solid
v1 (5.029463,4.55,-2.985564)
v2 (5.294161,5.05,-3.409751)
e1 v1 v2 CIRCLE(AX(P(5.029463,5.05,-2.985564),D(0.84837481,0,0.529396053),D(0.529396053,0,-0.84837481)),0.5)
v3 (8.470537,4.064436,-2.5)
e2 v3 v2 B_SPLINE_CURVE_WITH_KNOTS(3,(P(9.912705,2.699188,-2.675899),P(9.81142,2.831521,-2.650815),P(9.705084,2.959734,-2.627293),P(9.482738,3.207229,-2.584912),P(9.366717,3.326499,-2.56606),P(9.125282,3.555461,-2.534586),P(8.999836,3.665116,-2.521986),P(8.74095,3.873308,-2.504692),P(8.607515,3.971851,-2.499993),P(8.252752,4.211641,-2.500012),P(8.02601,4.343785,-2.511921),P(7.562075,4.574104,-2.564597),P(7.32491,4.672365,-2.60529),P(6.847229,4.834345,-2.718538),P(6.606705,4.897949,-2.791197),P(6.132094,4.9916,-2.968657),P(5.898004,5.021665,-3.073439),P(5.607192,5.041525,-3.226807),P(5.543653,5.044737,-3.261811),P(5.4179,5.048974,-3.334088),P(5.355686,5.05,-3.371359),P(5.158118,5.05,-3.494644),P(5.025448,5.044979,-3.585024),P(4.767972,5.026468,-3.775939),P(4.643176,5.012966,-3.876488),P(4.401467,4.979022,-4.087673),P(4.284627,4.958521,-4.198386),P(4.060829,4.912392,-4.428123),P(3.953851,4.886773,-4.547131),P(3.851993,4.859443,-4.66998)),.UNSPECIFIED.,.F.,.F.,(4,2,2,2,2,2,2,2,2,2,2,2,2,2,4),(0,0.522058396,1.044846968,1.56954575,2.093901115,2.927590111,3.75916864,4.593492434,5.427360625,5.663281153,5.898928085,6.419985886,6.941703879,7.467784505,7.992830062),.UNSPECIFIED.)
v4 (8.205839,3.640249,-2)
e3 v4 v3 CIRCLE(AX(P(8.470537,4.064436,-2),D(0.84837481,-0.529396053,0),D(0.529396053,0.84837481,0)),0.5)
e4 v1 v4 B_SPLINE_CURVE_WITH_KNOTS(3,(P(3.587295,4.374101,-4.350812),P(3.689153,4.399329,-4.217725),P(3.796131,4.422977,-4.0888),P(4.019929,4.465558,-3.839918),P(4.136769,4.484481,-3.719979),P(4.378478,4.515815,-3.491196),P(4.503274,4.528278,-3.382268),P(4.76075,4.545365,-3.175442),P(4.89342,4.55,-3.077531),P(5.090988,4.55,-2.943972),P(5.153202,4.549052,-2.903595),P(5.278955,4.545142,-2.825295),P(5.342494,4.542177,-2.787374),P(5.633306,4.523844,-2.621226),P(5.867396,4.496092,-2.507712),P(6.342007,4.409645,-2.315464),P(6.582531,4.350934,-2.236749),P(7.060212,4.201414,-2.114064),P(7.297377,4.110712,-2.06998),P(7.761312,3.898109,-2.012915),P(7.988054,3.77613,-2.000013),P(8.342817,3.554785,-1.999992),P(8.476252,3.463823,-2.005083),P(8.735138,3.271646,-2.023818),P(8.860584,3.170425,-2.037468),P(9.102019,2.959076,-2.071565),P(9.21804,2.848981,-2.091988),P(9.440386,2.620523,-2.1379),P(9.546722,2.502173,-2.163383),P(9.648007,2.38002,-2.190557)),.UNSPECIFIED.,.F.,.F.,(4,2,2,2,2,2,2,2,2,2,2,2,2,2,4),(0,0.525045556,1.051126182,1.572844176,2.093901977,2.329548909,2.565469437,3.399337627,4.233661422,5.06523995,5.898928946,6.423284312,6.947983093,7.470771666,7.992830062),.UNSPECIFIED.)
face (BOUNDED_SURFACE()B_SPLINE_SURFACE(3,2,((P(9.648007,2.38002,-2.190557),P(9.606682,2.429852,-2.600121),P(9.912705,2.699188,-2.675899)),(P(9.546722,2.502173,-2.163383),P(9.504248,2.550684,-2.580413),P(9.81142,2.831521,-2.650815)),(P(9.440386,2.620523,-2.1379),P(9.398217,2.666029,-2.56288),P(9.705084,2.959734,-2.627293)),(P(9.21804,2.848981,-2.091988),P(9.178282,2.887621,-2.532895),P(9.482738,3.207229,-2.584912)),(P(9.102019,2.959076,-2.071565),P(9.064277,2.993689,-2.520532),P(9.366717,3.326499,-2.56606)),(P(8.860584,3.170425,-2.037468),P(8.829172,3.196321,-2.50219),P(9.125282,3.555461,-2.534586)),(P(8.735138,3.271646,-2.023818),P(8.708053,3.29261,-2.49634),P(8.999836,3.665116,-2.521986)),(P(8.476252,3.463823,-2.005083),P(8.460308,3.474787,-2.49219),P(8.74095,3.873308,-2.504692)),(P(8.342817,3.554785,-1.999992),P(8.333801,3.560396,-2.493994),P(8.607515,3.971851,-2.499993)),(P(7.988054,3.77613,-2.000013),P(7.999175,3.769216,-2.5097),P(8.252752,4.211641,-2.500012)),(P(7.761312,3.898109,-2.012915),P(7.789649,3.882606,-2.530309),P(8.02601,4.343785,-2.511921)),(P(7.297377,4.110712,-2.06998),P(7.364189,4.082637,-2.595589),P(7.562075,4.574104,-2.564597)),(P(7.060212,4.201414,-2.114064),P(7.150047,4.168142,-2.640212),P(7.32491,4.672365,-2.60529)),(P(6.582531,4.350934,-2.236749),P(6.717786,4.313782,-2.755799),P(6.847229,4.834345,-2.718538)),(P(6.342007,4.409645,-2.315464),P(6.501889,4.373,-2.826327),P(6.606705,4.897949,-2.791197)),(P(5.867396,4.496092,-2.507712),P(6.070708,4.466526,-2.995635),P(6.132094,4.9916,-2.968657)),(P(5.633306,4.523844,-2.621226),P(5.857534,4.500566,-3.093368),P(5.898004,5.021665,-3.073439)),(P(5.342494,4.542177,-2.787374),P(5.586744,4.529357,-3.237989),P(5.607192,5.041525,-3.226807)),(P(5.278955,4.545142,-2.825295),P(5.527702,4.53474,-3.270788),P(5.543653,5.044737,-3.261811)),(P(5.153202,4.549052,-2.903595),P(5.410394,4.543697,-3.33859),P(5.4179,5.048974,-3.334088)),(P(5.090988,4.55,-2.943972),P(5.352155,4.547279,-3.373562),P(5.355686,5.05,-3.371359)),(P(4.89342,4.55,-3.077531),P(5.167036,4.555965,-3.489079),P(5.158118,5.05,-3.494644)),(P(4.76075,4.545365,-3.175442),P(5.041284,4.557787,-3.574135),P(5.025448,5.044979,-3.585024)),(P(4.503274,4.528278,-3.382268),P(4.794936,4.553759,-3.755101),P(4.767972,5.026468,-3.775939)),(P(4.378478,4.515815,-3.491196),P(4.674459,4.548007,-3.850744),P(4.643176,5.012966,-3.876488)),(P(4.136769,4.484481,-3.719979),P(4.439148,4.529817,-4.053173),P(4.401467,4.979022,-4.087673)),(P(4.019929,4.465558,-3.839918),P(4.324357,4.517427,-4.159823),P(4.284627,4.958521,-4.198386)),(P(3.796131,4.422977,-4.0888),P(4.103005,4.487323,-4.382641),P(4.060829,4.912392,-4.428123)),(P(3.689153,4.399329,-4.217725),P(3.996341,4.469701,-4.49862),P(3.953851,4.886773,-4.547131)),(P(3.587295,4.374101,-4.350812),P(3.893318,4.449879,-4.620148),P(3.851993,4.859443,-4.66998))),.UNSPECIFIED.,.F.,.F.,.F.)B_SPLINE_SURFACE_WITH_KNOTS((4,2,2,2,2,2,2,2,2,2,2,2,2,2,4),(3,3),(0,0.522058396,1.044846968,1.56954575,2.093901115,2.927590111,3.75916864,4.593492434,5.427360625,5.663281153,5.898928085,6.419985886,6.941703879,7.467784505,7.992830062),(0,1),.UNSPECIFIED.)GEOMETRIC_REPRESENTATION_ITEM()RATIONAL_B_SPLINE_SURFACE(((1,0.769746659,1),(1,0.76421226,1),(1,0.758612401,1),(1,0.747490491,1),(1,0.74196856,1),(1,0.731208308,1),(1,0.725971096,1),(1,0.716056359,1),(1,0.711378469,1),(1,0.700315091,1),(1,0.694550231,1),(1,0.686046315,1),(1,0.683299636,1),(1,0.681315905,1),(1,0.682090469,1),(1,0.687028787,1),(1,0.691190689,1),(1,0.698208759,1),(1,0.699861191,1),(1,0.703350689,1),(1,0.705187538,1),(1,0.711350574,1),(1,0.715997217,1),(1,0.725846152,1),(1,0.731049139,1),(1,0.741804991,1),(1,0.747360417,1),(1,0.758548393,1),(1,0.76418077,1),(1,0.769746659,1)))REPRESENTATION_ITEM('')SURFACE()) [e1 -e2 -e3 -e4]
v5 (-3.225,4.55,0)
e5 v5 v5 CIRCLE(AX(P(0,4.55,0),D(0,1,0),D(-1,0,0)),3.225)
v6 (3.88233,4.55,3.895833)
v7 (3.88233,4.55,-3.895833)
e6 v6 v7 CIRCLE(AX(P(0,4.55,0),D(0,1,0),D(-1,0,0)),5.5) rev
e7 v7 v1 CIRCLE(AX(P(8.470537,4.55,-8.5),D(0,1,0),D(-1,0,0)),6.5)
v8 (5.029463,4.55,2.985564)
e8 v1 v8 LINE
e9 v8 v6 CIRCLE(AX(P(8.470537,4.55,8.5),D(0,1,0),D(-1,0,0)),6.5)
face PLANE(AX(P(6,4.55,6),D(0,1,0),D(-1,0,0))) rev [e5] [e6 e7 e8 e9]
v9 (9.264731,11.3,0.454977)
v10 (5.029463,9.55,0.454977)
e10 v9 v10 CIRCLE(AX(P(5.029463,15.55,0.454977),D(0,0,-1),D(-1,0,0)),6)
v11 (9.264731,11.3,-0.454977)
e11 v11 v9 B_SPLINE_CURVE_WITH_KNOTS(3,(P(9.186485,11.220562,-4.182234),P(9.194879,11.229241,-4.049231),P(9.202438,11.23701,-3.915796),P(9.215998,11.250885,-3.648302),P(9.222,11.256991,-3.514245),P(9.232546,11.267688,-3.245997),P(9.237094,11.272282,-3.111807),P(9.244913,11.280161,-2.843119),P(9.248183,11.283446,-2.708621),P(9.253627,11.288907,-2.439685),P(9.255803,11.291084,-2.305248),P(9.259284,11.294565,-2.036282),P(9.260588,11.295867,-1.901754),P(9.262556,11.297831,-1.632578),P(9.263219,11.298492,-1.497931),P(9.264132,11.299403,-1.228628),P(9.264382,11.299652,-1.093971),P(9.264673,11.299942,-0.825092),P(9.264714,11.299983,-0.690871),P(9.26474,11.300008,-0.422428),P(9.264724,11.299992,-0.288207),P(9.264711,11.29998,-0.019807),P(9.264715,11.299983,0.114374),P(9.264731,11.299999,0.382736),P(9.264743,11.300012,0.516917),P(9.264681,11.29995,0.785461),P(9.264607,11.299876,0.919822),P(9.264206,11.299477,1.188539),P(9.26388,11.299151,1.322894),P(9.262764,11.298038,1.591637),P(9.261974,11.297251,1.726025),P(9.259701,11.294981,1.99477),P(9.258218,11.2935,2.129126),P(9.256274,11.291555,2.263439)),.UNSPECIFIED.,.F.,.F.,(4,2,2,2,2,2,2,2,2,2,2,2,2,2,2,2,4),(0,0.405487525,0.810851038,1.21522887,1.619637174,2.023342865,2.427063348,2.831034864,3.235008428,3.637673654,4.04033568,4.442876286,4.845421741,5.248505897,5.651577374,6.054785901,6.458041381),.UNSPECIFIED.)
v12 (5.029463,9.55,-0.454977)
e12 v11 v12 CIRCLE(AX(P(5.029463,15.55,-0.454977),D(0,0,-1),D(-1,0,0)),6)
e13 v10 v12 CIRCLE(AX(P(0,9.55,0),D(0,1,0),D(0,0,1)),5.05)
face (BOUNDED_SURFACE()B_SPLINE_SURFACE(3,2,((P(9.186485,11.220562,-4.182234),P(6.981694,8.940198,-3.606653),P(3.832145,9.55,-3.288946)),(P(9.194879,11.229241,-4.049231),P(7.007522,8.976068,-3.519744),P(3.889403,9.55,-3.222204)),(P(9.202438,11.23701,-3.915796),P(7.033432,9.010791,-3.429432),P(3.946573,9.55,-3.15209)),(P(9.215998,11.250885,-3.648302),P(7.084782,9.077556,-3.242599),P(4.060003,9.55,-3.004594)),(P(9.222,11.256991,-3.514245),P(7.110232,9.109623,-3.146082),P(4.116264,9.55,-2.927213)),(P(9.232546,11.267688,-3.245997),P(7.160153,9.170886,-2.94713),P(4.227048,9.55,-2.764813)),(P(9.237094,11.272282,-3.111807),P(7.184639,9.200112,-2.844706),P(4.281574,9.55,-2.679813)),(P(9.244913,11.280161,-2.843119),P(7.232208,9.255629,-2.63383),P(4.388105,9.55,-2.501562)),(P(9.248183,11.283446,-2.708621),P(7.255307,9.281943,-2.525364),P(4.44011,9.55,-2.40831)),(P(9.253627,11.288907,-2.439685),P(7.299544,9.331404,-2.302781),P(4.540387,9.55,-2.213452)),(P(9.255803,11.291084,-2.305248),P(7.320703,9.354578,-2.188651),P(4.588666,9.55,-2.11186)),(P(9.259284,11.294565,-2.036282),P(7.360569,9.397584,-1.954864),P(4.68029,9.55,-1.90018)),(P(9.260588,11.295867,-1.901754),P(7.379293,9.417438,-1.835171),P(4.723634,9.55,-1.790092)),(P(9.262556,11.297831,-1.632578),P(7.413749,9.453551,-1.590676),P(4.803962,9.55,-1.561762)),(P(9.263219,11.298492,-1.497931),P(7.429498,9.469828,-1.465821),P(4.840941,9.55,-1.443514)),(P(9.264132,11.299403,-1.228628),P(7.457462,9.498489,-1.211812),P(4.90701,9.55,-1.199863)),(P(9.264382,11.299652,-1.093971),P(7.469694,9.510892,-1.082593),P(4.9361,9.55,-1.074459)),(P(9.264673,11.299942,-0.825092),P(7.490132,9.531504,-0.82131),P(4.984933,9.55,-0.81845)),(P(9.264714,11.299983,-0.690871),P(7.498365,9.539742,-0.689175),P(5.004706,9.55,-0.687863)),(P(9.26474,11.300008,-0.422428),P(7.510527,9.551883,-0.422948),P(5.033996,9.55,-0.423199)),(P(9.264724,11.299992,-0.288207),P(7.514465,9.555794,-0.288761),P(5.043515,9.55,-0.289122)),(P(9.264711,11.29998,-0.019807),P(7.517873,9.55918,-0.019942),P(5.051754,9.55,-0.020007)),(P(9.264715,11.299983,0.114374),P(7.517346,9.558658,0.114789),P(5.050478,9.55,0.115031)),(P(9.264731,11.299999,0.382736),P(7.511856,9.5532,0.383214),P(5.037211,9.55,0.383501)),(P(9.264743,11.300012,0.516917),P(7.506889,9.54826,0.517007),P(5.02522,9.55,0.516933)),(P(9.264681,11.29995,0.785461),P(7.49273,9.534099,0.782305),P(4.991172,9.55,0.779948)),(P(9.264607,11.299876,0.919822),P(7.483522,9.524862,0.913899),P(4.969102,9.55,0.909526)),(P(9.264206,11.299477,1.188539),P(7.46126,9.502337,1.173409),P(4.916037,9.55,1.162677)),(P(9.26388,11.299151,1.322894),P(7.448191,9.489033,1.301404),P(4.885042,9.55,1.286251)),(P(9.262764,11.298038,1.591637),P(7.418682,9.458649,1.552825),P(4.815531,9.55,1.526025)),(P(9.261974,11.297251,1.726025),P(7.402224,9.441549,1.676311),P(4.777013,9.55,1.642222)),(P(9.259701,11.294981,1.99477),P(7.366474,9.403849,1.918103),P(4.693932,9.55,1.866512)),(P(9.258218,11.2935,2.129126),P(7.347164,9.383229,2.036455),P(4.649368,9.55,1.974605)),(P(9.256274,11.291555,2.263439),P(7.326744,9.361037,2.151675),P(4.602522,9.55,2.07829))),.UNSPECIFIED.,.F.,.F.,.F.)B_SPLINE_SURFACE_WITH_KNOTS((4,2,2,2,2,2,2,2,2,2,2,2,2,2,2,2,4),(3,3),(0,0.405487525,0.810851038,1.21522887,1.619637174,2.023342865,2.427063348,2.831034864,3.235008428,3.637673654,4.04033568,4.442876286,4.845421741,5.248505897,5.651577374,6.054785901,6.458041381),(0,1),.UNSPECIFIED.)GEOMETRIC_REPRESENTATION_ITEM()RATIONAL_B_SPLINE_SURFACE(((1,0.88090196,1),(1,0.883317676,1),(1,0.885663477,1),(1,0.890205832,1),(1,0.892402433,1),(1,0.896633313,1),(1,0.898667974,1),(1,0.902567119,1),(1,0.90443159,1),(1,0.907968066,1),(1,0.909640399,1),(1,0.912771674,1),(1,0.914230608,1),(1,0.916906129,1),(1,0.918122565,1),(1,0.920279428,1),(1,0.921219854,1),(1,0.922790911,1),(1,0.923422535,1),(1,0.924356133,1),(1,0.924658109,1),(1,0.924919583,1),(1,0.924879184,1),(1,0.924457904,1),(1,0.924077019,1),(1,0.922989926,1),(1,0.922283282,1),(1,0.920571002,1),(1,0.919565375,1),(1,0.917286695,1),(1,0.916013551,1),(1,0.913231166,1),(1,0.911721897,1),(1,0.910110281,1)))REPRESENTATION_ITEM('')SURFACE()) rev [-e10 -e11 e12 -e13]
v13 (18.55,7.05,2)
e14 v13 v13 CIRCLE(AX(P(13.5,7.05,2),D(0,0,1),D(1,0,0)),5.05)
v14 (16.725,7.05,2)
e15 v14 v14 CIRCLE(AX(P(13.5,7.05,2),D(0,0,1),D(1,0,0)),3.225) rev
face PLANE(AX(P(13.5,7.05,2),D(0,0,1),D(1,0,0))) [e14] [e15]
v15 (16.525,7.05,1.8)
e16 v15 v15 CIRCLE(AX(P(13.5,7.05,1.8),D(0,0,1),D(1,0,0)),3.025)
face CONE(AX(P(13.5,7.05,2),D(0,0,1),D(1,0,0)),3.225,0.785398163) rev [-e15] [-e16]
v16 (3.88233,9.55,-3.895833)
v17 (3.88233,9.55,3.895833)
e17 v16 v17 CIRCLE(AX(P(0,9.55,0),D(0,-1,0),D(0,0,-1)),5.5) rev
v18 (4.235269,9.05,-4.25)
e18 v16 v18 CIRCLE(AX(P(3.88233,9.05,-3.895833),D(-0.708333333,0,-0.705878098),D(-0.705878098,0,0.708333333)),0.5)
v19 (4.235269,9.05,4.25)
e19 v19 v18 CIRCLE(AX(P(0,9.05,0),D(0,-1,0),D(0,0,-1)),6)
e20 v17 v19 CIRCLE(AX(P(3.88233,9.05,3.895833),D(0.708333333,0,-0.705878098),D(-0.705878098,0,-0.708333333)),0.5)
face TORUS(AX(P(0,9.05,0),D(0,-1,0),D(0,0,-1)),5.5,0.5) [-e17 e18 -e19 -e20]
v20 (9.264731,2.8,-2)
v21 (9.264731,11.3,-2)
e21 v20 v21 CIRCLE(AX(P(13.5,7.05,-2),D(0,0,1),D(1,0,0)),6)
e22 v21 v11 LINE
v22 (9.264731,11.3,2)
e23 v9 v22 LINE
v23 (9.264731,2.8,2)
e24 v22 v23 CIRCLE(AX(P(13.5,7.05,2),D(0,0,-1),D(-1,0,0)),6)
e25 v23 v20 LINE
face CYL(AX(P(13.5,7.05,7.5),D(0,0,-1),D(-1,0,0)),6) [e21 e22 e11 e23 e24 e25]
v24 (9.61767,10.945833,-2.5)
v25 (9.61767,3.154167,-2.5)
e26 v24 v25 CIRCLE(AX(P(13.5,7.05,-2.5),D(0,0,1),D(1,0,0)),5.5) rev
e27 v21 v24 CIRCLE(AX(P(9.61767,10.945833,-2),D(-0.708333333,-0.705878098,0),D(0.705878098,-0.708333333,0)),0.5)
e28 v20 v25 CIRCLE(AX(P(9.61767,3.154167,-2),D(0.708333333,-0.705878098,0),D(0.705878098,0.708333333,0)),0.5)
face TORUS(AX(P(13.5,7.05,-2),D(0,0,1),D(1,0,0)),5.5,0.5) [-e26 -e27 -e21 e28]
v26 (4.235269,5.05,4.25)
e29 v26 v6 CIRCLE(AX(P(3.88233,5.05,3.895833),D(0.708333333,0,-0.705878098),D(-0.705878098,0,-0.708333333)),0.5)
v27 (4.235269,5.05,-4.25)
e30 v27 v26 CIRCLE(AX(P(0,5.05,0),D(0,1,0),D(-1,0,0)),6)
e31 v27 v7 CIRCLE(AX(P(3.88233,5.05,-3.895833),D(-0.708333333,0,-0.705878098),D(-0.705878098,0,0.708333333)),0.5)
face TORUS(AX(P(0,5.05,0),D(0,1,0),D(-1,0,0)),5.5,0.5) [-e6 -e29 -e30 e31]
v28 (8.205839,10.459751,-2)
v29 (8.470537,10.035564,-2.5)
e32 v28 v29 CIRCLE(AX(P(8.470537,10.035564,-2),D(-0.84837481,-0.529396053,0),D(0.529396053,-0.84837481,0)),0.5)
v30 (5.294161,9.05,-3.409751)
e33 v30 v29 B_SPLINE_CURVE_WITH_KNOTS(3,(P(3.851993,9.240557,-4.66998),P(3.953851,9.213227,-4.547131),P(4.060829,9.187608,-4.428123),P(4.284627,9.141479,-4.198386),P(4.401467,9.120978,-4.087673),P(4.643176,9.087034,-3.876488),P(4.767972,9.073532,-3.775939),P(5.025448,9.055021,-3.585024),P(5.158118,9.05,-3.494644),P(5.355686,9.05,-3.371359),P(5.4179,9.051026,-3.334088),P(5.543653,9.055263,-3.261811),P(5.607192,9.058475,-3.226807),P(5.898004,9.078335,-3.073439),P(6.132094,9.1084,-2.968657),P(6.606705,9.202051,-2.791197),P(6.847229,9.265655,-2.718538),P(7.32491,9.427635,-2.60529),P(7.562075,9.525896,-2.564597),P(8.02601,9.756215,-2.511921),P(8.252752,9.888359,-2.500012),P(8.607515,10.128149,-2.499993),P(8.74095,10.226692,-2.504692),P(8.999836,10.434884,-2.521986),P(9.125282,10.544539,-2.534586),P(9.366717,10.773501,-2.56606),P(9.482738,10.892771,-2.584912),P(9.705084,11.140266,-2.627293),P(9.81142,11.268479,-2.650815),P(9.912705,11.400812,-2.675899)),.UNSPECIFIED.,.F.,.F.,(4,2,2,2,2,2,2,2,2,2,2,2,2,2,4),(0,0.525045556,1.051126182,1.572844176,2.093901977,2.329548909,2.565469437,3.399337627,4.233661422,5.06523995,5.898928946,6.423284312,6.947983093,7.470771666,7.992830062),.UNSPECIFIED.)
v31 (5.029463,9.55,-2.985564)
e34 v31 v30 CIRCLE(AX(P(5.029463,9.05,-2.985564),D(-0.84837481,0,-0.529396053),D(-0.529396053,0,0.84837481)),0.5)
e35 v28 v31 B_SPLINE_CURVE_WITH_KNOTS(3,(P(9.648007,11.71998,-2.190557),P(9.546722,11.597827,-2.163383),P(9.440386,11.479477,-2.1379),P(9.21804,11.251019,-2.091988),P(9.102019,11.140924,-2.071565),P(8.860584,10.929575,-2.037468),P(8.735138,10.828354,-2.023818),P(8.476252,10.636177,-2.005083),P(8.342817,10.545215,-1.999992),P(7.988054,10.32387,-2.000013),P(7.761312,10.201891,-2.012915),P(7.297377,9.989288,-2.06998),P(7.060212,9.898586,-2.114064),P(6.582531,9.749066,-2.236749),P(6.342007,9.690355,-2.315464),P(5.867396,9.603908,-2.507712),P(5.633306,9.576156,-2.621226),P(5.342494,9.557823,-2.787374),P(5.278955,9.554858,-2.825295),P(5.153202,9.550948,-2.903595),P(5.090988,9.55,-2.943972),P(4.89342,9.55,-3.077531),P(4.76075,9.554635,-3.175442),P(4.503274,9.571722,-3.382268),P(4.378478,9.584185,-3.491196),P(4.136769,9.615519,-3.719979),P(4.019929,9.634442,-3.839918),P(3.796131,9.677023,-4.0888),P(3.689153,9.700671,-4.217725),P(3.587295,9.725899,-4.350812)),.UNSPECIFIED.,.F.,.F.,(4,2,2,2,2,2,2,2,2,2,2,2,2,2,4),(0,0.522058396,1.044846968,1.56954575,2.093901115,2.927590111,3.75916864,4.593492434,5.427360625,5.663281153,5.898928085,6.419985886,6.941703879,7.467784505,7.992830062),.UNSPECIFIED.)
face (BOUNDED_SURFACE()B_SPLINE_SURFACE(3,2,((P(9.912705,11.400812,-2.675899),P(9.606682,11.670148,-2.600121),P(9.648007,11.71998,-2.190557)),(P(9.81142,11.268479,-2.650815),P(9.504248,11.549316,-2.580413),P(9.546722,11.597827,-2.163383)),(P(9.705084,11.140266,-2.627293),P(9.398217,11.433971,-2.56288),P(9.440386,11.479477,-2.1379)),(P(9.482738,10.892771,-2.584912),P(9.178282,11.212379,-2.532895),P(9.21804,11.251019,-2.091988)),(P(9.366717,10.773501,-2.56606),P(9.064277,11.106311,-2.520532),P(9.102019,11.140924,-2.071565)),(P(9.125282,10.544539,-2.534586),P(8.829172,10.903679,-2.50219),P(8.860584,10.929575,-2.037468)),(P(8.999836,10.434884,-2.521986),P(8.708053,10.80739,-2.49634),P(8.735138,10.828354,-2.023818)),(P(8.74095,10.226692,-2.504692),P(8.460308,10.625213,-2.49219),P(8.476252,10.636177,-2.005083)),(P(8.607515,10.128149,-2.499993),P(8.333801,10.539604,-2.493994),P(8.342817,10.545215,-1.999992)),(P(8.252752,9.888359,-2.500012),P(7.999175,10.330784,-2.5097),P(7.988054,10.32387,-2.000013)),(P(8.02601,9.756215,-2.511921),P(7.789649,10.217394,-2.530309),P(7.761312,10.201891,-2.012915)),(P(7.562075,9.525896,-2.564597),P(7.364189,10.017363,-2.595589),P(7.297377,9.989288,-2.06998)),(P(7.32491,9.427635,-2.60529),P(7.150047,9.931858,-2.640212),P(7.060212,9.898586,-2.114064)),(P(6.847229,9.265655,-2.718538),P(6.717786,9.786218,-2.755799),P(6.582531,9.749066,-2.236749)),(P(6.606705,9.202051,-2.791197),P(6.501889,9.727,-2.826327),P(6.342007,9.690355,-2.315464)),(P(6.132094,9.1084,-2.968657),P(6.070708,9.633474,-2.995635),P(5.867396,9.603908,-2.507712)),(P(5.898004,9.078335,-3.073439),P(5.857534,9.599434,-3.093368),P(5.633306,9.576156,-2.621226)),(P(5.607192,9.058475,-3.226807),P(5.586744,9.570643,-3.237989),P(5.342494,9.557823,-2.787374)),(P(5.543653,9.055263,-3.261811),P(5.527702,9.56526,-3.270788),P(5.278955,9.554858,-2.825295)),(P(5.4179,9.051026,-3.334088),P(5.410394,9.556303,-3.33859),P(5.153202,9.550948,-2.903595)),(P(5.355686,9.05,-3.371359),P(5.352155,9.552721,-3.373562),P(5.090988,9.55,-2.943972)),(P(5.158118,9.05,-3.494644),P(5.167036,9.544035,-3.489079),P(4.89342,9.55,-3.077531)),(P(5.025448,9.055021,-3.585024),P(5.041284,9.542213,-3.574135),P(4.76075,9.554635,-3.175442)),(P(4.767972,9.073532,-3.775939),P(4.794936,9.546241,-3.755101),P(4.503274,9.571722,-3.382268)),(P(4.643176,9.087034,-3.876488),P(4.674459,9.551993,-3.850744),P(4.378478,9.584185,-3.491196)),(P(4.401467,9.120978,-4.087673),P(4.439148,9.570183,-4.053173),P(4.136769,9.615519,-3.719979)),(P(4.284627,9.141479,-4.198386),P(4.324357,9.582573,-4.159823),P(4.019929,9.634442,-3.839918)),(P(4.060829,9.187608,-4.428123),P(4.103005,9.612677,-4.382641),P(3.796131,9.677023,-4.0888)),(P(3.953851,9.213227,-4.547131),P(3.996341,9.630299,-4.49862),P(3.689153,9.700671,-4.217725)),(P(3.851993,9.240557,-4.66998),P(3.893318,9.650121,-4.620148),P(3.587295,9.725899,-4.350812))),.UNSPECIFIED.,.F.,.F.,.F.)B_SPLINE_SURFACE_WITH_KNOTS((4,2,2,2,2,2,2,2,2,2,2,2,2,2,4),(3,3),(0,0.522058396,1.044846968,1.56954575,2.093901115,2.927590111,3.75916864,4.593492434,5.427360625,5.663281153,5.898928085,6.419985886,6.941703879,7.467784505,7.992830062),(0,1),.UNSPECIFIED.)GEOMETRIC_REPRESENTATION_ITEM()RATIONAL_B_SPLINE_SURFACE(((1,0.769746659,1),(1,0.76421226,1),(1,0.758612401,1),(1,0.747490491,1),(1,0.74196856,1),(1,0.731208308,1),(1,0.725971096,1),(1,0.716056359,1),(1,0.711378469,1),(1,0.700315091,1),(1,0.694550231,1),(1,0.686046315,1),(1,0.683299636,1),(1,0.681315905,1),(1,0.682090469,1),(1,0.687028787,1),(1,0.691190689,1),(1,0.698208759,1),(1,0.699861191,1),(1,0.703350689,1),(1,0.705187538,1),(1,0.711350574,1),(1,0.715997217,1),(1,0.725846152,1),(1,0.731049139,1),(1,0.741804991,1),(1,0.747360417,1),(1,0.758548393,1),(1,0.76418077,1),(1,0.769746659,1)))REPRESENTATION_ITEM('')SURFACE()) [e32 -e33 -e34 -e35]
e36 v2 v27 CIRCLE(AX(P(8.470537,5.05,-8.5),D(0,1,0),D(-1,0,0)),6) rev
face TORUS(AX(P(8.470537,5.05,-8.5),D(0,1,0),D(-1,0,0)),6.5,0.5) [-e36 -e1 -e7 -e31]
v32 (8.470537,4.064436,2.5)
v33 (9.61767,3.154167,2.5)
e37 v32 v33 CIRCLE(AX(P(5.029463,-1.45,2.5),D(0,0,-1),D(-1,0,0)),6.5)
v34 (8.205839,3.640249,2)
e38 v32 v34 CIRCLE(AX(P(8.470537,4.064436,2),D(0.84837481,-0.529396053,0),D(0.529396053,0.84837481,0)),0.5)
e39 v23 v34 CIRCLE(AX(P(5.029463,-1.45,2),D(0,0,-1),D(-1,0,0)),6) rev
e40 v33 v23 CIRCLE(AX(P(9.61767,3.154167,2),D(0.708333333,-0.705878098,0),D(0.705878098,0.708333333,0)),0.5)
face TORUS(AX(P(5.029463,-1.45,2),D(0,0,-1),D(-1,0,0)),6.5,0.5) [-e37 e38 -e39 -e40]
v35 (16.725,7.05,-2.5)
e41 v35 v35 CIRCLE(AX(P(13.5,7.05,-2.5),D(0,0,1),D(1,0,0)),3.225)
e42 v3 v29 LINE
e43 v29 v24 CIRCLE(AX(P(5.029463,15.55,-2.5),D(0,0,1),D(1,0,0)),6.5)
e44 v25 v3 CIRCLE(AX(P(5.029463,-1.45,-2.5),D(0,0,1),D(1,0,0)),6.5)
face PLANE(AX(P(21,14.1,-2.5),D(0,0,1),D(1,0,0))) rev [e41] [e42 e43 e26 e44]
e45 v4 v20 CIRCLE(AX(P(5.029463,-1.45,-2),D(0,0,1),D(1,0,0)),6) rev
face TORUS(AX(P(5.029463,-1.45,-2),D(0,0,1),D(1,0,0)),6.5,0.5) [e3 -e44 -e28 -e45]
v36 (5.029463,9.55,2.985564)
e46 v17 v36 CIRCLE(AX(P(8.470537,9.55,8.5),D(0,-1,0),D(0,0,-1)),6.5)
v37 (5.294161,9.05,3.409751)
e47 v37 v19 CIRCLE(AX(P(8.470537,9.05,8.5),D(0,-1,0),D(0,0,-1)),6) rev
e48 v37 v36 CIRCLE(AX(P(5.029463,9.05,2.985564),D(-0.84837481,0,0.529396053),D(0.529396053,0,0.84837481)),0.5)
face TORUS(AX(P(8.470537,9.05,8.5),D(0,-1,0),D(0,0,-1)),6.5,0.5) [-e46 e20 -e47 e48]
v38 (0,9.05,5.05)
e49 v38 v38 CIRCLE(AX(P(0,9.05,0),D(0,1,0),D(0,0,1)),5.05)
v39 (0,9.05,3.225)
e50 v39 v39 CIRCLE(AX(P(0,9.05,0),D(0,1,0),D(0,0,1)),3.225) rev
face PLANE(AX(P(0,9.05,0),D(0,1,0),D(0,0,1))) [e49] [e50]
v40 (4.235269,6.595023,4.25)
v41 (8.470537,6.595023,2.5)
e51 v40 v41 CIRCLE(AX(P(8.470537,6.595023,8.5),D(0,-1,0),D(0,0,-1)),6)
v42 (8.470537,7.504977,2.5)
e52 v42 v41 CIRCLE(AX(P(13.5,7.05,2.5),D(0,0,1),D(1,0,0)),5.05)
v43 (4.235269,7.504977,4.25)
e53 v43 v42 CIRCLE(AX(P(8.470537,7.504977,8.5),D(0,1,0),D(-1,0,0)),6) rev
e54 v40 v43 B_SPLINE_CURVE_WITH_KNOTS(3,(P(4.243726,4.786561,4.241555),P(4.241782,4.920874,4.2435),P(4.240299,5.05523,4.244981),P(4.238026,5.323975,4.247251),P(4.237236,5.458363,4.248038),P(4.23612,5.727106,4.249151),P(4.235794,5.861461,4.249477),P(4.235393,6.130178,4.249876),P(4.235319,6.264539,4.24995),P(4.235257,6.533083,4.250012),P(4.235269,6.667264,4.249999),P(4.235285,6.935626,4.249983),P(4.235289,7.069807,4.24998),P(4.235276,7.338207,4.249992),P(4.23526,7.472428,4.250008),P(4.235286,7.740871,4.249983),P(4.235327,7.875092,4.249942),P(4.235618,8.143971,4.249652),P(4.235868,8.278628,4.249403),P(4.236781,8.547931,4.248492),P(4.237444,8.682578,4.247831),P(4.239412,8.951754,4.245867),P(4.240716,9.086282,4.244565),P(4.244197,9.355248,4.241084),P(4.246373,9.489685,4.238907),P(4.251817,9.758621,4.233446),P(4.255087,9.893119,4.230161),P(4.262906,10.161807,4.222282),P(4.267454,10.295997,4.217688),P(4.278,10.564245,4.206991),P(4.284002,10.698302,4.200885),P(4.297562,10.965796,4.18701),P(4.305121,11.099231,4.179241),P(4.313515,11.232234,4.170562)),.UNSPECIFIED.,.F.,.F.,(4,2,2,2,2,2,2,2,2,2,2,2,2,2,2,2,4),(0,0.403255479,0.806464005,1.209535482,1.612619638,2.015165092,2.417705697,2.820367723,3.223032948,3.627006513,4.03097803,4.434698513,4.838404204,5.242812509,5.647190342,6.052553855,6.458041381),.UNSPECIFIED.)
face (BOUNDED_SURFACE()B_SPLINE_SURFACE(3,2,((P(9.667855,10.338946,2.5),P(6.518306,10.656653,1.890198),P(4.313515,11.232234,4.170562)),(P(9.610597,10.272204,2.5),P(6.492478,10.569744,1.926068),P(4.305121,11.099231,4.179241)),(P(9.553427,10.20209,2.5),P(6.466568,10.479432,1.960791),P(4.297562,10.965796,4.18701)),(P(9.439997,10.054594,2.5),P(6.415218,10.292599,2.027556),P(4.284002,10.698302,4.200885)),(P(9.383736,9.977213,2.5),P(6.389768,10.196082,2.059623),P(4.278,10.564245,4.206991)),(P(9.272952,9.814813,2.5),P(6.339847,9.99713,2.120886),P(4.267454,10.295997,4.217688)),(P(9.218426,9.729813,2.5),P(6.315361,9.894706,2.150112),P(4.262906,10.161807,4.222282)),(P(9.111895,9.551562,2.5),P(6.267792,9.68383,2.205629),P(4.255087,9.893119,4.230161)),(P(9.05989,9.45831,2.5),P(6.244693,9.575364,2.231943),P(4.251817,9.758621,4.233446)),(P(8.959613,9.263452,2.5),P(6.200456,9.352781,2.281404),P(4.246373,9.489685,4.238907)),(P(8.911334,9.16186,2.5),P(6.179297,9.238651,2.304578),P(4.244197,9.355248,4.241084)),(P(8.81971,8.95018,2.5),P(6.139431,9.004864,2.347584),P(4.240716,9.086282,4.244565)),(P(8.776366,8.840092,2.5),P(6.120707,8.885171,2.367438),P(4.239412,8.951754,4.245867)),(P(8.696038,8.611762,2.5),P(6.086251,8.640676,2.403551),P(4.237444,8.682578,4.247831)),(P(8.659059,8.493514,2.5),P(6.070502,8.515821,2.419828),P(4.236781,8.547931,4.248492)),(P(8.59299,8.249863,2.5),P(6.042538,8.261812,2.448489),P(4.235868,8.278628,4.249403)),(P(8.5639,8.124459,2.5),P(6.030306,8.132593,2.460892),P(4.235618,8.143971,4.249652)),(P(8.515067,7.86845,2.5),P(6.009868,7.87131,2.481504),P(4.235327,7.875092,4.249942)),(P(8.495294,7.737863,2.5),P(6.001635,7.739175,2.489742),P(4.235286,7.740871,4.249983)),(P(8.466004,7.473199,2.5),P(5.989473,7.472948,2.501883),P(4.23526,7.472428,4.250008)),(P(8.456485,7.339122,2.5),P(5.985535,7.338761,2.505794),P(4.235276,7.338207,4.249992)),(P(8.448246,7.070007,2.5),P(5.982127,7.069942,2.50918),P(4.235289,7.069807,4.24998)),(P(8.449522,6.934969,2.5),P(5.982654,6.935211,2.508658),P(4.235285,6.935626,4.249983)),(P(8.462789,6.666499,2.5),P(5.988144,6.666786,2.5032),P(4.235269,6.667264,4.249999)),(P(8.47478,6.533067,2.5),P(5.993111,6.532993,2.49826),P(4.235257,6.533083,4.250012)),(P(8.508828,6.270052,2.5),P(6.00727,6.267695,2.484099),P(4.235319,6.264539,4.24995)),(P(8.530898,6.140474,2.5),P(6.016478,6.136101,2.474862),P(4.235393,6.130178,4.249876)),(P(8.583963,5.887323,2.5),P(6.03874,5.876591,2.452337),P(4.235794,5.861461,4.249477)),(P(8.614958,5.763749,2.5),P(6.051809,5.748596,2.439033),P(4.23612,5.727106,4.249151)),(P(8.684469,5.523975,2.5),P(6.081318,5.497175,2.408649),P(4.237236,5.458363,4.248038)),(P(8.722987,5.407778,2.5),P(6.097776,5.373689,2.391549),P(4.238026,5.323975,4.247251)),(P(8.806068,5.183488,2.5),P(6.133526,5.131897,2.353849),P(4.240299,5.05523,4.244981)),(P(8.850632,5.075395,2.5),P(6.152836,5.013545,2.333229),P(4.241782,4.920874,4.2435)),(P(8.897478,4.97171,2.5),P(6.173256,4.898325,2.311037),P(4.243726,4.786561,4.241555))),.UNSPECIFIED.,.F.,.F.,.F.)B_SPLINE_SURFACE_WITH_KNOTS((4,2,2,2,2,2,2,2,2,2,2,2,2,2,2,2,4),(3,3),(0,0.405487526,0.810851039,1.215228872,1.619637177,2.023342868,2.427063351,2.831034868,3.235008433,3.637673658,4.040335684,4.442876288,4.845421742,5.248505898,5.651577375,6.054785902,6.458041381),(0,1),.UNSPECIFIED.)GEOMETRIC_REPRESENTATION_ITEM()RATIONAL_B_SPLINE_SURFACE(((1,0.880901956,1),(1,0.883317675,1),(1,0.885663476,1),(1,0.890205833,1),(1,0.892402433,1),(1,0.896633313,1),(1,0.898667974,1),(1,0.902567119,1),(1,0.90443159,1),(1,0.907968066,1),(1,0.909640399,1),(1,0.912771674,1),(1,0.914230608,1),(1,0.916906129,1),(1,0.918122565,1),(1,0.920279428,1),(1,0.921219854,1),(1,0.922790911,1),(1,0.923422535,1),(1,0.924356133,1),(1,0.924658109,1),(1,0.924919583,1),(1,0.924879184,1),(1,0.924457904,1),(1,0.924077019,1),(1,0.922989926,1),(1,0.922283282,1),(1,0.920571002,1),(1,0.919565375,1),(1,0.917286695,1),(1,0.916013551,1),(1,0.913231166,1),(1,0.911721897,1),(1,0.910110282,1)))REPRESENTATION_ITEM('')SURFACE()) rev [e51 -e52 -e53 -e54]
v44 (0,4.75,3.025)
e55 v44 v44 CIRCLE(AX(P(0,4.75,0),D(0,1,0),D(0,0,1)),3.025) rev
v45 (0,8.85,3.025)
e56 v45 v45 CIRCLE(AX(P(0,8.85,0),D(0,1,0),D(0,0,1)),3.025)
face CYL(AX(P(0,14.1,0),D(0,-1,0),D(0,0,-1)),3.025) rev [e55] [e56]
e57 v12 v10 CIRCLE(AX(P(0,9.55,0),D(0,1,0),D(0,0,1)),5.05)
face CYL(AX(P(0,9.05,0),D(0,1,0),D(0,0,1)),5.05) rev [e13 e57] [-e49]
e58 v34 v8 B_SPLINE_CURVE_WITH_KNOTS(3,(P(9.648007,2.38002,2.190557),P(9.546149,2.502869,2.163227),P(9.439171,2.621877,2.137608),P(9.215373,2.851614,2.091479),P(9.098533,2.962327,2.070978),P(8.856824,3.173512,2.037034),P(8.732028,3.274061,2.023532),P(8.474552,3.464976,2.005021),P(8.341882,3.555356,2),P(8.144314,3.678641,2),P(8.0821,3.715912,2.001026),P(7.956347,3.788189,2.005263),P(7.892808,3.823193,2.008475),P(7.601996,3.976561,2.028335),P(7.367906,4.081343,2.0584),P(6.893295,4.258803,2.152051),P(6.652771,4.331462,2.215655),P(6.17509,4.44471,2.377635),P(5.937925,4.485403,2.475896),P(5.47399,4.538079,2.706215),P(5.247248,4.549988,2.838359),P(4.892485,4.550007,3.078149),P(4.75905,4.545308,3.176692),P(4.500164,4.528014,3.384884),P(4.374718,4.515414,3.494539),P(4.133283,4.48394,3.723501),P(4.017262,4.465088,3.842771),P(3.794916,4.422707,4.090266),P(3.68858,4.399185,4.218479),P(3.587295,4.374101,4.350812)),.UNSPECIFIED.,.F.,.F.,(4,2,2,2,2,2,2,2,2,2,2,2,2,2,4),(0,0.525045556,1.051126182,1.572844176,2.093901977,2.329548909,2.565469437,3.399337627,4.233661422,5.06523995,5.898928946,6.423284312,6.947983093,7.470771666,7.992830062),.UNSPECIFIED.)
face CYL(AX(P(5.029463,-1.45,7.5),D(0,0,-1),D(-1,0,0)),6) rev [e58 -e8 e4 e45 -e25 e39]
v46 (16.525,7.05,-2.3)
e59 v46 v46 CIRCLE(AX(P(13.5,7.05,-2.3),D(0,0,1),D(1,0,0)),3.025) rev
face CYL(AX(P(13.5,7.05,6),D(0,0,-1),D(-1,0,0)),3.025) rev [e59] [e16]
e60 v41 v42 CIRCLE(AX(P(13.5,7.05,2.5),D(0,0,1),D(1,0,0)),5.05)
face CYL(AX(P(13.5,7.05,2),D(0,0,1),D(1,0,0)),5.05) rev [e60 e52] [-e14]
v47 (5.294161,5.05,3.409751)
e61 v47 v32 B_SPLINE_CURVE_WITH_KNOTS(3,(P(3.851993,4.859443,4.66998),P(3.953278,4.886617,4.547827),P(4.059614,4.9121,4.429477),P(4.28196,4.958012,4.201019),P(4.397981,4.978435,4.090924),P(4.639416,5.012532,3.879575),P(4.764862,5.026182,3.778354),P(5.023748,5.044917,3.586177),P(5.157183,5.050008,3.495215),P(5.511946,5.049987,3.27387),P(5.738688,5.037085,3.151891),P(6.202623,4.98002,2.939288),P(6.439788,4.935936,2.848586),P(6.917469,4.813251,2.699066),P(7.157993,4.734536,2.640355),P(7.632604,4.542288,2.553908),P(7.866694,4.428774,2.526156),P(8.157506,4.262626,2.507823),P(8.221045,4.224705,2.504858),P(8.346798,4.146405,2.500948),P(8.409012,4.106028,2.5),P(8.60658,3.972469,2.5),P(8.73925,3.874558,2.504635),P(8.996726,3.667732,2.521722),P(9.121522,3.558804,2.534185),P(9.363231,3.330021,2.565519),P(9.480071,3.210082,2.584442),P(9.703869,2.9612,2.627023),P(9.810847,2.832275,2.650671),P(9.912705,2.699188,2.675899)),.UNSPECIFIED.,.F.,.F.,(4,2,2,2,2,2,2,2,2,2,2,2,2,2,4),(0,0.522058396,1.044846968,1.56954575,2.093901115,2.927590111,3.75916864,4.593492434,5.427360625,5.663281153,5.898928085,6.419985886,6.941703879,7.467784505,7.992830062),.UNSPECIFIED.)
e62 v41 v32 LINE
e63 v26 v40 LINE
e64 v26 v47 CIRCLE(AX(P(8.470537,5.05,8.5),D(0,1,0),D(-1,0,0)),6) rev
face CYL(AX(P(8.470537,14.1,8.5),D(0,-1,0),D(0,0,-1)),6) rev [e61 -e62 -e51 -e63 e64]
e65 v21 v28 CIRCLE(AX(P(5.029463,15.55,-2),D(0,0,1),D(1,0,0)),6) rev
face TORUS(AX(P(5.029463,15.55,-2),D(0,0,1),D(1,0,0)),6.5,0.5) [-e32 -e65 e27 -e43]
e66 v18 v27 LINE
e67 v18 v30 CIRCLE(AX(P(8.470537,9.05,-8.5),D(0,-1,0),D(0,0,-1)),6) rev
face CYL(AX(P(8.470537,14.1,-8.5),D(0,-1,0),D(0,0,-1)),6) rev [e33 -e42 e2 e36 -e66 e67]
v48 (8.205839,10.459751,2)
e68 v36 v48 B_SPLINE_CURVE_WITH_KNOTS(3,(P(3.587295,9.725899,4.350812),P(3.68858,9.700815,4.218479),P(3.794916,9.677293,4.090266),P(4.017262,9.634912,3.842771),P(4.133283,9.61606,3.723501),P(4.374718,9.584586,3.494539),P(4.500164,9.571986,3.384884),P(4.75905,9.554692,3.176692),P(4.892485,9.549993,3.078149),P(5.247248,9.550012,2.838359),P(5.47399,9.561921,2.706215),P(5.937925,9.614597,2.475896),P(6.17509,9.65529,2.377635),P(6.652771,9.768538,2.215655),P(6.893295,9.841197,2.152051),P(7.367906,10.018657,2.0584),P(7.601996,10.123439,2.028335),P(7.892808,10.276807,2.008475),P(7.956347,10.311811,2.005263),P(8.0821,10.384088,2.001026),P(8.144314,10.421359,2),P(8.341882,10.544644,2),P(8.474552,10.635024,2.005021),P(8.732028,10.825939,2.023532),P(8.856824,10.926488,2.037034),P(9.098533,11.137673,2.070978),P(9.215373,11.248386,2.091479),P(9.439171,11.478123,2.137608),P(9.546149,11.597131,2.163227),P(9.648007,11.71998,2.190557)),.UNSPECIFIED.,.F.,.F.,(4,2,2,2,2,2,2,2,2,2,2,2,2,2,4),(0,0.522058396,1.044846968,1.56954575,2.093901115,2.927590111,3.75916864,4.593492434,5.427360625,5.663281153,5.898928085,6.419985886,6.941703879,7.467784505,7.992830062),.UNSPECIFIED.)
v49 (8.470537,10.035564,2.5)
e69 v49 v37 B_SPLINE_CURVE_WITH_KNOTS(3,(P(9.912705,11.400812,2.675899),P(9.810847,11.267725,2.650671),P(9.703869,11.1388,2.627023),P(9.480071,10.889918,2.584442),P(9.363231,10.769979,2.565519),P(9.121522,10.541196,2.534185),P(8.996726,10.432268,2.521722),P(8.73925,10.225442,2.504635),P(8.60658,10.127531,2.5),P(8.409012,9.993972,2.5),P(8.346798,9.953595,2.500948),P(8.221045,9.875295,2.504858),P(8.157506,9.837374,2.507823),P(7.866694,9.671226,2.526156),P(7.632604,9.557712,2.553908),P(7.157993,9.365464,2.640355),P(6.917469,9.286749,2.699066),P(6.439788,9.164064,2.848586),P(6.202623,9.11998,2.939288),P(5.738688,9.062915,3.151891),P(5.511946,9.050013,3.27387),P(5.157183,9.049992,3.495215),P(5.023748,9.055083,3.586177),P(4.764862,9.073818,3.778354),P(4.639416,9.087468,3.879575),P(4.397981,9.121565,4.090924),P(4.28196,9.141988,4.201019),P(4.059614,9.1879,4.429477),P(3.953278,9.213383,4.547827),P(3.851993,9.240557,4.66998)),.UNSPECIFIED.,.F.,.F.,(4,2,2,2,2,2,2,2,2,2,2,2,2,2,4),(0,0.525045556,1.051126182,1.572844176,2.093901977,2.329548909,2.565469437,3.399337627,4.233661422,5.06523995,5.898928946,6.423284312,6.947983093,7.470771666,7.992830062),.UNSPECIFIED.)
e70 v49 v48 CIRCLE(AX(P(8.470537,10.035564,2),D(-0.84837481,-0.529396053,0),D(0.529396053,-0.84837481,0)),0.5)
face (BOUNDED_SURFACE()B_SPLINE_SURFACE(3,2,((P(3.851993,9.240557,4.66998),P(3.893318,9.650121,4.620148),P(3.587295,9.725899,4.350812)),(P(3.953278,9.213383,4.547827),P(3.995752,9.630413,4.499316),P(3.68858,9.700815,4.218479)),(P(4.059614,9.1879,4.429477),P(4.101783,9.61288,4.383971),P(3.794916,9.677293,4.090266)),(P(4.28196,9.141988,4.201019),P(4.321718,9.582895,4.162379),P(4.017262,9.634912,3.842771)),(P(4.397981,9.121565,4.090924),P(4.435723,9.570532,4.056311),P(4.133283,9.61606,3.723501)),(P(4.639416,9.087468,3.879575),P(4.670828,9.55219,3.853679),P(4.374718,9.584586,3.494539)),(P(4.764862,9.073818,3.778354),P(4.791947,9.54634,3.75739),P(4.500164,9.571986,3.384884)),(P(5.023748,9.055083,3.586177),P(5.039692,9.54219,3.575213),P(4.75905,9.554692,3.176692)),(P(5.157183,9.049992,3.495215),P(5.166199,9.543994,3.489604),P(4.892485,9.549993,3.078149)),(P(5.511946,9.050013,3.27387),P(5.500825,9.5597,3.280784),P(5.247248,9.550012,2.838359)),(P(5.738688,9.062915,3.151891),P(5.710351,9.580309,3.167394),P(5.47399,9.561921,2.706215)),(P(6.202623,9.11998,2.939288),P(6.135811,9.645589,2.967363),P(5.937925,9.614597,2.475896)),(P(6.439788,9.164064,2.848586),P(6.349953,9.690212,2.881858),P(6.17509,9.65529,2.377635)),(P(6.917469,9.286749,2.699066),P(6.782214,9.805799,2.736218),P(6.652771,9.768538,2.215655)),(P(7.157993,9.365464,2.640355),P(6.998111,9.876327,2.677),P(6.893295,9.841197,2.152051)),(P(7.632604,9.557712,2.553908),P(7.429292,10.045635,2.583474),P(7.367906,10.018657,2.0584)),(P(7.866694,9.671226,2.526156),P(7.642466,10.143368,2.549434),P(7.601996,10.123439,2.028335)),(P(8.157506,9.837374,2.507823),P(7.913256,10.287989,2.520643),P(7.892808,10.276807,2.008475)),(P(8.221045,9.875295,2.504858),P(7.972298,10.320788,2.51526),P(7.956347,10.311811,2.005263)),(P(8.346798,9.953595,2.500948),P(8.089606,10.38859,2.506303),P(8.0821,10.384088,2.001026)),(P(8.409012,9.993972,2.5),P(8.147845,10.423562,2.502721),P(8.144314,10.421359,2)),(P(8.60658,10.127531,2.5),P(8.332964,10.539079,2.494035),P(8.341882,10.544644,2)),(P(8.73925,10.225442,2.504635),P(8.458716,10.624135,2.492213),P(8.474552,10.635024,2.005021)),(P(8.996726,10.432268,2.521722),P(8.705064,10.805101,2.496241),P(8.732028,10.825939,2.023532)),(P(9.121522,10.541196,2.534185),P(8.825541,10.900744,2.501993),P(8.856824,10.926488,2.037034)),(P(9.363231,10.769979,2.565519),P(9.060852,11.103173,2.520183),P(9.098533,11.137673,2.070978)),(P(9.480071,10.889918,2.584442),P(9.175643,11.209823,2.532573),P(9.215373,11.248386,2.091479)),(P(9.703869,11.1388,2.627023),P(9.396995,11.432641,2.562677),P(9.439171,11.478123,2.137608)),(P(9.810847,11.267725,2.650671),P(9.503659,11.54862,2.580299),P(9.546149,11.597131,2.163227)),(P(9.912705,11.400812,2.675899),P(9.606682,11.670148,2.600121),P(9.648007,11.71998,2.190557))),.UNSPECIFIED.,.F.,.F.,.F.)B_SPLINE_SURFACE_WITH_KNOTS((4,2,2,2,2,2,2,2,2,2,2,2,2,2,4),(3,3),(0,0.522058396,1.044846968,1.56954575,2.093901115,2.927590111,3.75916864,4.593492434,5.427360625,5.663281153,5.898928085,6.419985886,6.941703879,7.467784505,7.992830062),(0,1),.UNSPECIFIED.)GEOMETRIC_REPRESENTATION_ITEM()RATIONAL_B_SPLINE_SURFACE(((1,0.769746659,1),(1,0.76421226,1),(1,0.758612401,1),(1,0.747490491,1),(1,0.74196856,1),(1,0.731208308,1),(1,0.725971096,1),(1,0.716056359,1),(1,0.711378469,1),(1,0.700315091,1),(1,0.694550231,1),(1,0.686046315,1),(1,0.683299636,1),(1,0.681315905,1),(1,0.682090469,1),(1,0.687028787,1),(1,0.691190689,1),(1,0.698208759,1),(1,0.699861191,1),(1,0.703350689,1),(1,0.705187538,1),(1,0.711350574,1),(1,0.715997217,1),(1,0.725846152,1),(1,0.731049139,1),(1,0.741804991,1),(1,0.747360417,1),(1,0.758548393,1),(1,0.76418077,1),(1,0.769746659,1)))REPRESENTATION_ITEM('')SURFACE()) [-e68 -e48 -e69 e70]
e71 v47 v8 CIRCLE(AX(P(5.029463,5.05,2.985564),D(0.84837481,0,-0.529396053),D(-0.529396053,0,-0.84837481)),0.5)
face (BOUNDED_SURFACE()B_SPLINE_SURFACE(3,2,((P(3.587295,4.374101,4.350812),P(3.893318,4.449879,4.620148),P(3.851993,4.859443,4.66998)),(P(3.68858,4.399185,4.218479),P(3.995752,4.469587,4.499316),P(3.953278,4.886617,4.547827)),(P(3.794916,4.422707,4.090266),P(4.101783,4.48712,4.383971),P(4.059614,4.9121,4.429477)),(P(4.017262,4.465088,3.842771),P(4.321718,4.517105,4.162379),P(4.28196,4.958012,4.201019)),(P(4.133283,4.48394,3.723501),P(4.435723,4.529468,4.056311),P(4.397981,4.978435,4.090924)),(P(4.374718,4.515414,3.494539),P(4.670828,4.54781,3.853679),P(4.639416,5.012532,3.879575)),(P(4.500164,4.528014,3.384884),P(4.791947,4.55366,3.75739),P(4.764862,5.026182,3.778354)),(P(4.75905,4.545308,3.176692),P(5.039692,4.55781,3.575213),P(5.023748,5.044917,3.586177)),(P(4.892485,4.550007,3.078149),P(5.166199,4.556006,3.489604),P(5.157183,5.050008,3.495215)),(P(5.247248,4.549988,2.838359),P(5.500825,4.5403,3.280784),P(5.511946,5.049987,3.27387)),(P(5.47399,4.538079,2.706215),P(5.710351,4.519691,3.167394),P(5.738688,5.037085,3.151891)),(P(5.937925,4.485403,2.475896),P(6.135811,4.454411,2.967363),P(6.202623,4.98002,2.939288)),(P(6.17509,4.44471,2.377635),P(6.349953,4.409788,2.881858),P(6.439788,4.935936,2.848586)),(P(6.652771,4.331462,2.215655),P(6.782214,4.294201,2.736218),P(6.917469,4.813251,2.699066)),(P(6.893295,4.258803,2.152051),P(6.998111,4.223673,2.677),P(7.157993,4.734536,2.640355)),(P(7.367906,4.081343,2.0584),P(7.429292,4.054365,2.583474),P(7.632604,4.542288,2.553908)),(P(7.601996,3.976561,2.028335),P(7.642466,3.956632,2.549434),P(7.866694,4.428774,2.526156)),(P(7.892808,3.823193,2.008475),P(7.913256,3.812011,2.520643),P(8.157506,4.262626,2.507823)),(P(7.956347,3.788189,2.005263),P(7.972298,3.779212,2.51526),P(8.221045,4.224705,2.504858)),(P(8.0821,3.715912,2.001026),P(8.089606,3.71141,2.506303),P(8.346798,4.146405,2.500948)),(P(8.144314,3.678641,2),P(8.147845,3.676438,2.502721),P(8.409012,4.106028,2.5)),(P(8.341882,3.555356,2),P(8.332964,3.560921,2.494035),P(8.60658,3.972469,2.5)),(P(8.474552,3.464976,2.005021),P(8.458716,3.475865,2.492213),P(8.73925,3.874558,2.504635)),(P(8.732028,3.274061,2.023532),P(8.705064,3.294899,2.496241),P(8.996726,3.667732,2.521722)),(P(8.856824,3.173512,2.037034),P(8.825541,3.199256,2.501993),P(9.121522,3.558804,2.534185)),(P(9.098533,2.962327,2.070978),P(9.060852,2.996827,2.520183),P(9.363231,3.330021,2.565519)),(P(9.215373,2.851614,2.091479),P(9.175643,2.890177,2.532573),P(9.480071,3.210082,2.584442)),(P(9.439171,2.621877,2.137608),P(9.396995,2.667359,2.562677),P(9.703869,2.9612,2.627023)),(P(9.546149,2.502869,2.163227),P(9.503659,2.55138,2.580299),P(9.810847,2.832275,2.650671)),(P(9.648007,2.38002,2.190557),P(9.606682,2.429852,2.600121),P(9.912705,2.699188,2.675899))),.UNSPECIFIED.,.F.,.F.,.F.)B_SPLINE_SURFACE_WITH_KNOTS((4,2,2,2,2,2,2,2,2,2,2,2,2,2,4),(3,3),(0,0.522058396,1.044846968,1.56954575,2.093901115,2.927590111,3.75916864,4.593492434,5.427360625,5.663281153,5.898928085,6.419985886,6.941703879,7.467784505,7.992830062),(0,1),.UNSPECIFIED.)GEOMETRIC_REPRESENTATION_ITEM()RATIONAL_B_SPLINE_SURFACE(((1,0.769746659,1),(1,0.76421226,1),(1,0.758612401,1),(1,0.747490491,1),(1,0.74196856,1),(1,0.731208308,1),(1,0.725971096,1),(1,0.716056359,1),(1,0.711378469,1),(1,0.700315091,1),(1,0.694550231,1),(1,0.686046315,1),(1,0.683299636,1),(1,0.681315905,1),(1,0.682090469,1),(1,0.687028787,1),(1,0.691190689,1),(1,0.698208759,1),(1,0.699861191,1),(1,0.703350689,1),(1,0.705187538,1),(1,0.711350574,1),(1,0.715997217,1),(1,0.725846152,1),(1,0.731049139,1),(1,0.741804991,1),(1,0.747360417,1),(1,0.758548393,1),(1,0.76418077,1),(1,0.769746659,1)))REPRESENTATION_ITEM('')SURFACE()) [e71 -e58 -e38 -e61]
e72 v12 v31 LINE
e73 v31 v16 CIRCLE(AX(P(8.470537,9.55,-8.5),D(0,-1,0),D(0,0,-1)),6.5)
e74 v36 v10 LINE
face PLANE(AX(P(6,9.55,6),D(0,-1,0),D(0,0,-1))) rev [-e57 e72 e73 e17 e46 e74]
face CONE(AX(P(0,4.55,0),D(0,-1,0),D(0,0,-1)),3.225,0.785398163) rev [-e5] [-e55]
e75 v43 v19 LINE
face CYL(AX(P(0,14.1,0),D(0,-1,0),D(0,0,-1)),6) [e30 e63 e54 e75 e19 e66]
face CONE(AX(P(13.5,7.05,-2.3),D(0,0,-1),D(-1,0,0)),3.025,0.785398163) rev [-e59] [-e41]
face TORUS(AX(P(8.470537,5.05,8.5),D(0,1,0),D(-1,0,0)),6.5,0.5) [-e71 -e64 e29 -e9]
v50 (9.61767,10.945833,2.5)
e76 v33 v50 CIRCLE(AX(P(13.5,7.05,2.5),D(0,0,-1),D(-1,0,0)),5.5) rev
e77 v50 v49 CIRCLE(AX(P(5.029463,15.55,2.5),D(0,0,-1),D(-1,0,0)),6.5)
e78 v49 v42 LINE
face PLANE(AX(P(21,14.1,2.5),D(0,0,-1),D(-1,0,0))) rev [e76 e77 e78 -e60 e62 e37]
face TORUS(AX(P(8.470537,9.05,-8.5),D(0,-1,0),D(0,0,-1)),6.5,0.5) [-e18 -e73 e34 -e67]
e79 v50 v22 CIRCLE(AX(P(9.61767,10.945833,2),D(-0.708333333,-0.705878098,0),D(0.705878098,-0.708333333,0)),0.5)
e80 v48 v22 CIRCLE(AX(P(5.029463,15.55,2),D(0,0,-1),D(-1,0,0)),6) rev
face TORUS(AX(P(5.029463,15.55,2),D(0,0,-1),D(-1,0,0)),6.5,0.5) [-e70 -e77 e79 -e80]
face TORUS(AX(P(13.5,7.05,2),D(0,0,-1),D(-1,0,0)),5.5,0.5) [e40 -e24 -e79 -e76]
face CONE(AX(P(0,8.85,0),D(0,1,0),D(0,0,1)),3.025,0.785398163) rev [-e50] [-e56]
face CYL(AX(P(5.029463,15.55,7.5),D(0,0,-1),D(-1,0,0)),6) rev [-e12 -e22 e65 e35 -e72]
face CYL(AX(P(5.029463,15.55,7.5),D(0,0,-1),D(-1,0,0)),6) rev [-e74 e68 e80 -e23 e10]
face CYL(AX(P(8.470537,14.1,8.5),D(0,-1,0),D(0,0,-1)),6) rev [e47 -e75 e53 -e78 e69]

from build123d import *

# Parameters (mm, degrees)
SKETCH1_R               = 3.025
BOSS_EXTRUDE1_DEPTH     = 14.1
CUT_EXTRUDE1_DEPTH      = 26.996345897
CUT_EXTRUDE1_DEPTH_BACK = 26.996345897
SKETCH2_W               = 12
SKETCH2_H               = 4.55
SKETCH3_R               = 3.025
CUT_EXTRUDE2_DEPTH      = 27.684452402
CUT_EXTRUDE3_DEPTH      = 10
SKETCH6_R               = 5.05
CUT_EXTRUDE4_DEPTH      = 0.5
SKETCH7_R               = 5.05
CUT_EXTRUDE5_DEPTH      = 0.5
FILLET1_R               = 6
CHAMFER1_SIZE           = 0.2
FILLET2_R               = 0.5


with BuildPart() as part:
    # Sketch1 → Boss-Extrude1 (new body)
    with BuildSketch(Plane(origin=(0, 0, 0), x_dir=(1, 0, 0), z_dir=(0, 1, 0))):
        with BuildLine():
            Line((21, -2.5), (21, 2.5))
            Line((21, 2.5), (5.454356057, 2.5))
            ThreePointArc((5.454356057, 2.5), (-6, 0), (5.454356057, -2.5))
            Line((5.454356057, -2.5), (21, -2.5))
        make_face()
        Circle(SKETCH1_R, mode=Mode.SUBTRACT)
    extrude(amount=BOSS_EXTRUDE1_DEPTH)

    # Sketch2 → Cut-Extrude1 (cut, two sides: drawn at the far end of the back side and taken through both)
    with BuildSketch(Plane(origin=(0, 0, 0), x_dir=(-1, 0, 0), z_dir=(0, 0, -1)).offset(-CUT_EXTRUDE1_DEPTH_BACK)):
        with Locations((0, 2.275)):
            Rectangle(SKETCH2_W, SKETCH2_H)
        with Locations((0, 11.825)):
            Rectangle(SKETCH2_W, SKETCH2_H)
    extrude(amount=CUT_EXTRUDE1_DEPTH + CUT_EXTRUDE1_DEPTH_BACK, mode=Mode.SUBTRACT)

    # Sketch3 → Cut-Extrude2 (cut, through all)
    with BuildSketch(Plane(origin=(0, 0, -2.5), x_dir=(-1, 0, 0), z_dir=(0, 0, -1))):
        with Locations((-13.5, 7.05)):
            Circle(SKETCH3_R)
    extrude(amount=-CUT_EXTRUDE2_DEPTH, mode=Mode.SUBTRACT)

    # Sketch4 → Cut-Extrude3 (cut)
    with BuildSketch(Plane(origin=(0, 0, -2.5), x_dir=(-1, 0, 0), z_dir=(0, 0, -1))):
        with BuildLine():
            Line((-8.045643943, 9.55), (-6, 9.55))
            Line((-6, 9.55), (-6, 14.1))
            Line((-6, 14.1), (-21, 14.1))
            Line((-21, 14.1), (-21, 0))
            Line((-21, 0), (-6, 0))
            Line((-6, 0), (-6, 4.55))
            Line((-6, 4.55), (-8.045643943, 4.55))
            ThreePointArc((-8.045643943, 4.55), (-19.5, 7.05), (-8.045643943, 9.55))
        make_face()
    extrude(amount=-CUT_EXTRUDE3_DEPTH, mode=Mode.SUBTRACT)

    # Sketch6 → Cut-Extrude4 (cut)
    with BuildSketch(Plane(origin=(0, 9.55, 0), x_dir=(1, 0, 0), z_dir=(0, 1, 0))):
        Circle(SKETCH6_R)
    extrude(amount=-CUT_EXTRUDE4_DEPTH, mode=Mode.SUBTRACT)

    # Sketch7 → Cut-Extrude5 (cut)
    with BuildSketch(Plane.XY.offset(2.5)):
        with Locations((13.5, 7.05)):
            Circle(SKETCH7_R)
    extrude(amount=-CUT_EXTRUDE5_DEPTH, mode=Mode.SUBTRACT)

    # Fillet1
    fillet1_edges = [part.edges().sort_by_distance(p)[0] for p in [
        (5.454356057, 7.05, 2.5),
    ]]
    fillet(fillet1_edges, radius=FILLET1_R)
    fillet1_2_edges = [part.edges().sort_by_distance(p)[0] for p in [
        (8.045643943, 4.55, 0.007531715),
    ]]
    fillet(fillet1_2_edges, radius=FILLET1_R)
    fillet1_3_edges = [part.edges().sort_by_distance(p)[0] for p in [
        (5.454356057, 7.042468285, -2.5),
    ]]
    fillet(fillet1_3_edges, radius=FILLET1_R)
    fillet1_4_edges = [part.edges().sort_by_distance(p)[0] for p in [
        (8.045643943, 9.55, 0),
    ]]
    fillet(fillet1_4_edges, radius=FILLET1_R)

    # Chamfer1
    chamfer1_edges = [part.edges().sort_by_distance(p)[0] for p in [
        (16.525, 7.05, -2.5),
        (-3.025, 4.55, 0),
        (16.525, 7.05, 2),
        (-3.025, 9.05, 0),
    ]]
    chamfer(chamfer1_edges, length=CHAMFER1_SIZE)

    # Fillet2
    fillet2_edges = [part.edges().sort_by_distance(p)[0] for p in [
        (6.75, 9.801978442, 2.751978442),
        (19.5, 7.05, 2.5),
        (6.75, 4.298021558, 2.751978442),
        (-6, 4.55, 0),
        (6.75, 4.298021558, -2.751978442),
        (19.5, 7.05, -2.5),
        (6.75, 9.801978442, -2.751978442),
        (-6, 9.55, 0),
        (4.617982599, 9.55, 3.900236609),
        (4.617982599, 9.55, -3.900236609),
        (8.882017401, 10.950236609, 2.5),
        (8.882017401, 3.149763391, 2.5),
        (4.617982599, 4.55, 3.900236609),
        (4.617982599, 4.55, -3.900236609),
        (8.882017401, 3.149763391, -2.5),
        (8.882017401, 10.950236609, -2.5),
    ]]
    fillet(fillet2_edges, radius=FILLET2_R)


solid = part.part
